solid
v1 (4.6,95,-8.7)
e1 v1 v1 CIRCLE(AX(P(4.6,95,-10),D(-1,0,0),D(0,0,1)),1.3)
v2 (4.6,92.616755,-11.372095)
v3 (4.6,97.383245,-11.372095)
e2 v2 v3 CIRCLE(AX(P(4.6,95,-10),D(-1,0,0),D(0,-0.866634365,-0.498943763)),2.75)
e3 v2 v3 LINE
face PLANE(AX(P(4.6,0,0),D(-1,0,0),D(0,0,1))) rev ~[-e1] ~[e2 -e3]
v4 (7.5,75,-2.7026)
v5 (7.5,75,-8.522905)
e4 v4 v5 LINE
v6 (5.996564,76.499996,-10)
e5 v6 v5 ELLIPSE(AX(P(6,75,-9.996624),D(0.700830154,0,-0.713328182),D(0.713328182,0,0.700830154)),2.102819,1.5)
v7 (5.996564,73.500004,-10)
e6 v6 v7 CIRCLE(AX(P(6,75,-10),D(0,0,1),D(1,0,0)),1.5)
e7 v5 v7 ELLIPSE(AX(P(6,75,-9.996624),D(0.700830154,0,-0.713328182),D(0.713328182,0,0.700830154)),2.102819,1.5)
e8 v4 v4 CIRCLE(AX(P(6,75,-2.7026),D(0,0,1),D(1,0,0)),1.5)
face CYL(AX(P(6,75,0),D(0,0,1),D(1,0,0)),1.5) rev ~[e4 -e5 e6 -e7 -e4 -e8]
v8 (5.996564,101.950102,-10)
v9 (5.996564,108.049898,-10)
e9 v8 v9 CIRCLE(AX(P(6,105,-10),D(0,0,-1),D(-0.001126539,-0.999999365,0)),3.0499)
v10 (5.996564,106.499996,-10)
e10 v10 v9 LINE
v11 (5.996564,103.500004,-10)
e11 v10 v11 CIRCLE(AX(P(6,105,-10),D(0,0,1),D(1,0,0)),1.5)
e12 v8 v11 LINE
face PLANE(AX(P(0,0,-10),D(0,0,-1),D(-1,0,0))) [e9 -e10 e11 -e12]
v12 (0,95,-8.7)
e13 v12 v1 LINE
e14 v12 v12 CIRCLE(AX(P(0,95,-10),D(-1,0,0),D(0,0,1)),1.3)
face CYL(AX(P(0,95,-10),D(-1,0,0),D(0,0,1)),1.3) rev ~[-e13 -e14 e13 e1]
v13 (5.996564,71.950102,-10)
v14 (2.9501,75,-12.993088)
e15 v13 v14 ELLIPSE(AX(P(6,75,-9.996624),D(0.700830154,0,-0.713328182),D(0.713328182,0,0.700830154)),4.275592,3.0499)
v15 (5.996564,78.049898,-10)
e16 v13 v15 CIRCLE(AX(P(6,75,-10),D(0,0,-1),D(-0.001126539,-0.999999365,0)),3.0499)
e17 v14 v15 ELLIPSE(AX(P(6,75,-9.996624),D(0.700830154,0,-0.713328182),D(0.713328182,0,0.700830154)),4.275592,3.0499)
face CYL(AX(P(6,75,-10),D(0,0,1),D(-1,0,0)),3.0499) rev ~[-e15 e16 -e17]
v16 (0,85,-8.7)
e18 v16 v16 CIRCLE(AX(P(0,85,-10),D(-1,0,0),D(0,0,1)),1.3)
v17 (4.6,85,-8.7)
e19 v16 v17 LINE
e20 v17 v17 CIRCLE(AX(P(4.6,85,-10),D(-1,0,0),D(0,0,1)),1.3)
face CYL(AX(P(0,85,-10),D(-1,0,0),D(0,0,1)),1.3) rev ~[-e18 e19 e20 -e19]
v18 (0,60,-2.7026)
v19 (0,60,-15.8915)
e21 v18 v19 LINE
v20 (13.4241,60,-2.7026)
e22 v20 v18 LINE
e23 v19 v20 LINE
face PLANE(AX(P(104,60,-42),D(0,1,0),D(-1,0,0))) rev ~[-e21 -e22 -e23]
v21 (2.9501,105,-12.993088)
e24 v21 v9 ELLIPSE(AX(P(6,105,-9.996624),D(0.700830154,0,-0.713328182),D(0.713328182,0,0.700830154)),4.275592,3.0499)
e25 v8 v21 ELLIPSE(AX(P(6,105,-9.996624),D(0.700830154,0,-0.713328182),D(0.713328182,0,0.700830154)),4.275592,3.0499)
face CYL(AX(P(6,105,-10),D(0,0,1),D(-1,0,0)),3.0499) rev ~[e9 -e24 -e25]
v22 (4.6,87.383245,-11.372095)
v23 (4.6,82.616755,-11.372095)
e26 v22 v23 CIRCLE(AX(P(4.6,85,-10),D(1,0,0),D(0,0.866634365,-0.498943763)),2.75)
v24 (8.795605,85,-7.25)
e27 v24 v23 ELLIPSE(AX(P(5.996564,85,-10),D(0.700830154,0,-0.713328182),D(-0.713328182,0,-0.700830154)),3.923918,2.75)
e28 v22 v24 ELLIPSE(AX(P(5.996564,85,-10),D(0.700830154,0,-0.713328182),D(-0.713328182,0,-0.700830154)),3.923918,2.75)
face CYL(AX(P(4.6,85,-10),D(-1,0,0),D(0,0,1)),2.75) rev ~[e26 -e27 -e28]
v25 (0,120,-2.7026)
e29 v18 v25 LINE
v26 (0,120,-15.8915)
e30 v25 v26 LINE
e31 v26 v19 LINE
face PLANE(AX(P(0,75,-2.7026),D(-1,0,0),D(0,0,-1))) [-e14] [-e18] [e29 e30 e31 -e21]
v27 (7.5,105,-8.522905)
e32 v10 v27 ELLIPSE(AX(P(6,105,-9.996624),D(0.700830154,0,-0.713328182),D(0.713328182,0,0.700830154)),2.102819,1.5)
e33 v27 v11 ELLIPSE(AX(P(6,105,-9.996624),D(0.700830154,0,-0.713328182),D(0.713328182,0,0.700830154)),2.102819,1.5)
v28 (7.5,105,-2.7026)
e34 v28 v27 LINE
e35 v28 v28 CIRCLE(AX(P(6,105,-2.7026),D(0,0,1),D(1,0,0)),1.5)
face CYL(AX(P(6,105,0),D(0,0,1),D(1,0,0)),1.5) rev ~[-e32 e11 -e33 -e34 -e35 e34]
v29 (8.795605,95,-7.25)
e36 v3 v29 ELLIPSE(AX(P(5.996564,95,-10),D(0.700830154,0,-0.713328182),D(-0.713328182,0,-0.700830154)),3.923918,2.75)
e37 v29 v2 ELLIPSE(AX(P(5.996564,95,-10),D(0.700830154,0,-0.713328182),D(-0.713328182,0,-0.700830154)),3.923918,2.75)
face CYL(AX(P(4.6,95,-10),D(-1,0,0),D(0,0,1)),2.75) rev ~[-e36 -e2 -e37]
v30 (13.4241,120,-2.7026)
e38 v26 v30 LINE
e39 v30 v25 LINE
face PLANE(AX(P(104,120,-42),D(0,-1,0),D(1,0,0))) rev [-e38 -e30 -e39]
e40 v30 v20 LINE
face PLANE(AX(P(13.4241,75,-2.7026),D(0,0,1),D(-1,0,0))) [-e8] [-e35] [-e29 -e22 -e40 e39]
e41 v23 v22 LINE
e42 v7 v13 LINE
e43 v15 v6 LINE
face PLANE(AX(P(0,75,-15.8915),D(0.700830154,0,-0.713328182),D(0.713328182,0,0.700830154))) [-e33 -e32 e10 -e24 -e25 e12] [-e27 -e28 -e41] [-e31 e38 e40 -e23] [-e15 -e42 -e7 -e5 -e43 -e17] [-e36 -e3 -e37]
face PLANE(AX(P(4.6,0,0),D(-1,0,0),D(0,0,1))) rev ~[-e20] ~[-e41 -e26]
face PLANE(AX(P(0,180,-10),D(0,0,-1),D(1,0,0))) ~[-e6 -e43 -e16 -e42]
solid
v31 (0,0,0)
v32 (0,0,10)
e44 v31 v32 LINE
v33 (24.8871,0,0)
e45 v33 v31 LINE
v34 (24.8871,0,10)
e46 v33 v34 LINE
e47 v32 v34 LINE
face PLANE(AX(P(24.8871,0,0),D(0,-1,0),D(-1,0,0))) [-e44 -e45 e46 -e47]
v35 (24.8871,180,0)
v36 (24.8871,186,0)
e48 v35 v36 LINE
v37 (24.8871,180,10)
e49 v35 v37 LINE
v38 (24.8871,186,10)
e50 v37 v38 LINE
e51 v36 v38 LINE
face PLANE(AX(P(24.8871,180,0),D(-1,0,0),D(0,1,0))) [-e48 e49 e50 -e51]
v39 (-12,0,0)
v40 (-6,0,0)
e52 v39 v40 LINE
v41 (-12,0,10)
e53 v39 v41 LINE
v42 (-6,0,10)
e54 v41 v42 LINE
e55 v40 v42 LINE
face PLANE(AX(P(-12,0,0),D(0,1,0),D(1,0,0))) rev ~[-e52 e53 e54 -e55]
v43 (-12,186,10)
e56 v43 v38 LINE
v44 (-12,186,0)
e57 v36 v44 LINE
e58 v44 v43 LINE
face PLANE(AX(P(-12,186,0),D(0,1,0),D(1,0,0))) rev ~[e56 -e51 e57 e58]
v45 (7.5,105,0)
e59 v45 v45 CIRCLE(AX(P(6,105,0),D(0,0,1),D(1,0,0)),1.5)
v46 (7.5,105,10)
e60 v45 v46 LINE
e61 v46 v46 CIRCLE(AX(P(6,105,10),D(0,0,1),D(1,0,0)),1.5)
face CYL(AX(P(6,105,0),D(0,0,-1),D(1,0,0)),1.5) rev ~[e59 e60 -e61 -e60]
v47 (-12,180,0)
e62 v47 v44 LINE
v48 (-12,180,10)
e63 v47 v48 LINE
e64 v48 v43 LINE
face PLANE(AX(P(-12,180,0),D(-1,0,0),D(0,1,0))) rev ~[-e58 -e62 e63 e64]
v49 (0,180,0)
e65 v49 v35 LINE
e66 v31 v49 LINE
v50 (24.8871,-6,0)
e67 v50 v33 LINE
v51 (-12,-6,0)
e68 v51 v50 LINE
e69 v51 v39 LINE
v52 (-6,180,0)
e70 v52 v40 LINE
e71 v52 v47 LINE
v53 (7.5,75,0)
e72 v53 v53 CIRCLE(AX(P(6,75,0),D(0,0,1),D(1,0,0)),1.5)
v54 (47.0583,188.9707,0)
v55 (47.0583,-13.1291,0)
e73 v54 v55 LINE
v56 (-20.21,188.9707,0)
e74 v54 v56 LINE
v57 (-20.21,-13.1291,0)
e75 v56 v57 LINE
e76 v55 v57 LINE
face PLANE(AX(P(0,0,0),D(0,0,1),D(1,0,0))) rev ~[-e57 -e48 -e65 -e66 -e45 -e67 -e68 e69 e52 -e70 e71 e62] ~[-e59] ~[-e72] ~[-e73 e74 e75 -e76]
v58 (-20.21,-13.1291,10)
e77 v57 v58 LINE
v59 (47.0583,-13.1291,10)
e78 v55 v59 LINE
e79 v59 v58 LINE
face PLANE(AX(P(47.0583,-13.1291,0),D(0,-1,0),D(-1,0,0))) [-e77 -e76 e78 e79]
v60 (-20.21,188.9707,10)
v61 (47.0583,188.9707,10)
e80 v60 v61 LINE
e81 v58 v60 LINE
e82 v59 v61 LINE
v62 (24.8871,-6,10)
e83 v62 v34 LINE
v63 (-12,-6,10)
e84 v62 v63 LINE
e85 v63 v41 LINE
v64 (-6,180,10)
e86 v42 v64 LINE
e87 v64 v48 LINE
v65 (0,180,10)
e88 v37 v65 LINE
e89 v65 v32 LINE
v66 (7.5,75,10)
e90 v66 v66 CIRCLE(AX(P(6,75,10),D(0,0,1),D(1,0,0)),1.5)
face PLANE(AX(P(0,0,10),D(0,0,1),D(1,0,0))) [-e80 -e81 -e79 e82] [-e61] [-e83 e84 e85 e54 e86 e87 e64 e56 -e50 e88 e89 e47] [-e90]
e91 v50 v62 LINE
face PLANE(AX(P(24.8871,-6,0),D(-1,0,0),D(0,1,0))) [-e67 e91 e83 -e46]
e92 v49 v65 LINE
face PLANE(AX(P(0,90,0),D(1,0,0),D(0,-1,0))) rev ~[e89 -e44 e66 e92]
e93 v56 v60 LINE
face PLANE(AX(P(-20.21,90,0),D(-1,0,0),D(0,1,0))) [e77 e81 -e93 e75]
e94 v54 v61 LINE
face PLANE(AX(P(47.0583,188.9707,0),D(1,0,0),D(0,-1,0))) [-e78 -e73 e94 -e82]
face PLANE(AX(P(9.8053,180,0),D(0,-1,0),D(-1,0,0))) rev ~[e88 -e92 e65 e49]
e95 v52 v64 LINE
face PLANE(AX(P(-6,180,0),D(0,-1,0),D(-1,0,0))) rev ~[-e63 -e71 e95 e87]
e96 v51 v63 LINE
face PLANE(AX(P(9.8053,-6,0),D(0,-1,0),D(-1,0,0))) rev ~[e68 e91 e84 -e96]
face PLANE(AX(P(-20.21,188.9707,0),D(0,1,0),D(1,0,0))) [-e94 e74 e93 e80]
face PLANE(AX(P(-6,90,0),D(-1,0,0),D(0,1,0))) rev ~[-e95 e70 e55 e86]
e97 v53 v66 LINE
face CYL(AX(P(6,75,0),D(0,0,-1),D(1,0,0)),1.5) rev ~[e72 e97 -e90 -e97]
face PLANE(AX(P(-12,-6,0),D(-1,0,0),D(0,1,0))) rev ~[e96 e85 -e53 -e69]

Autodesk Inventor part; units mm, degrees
ref_plane "YZ Plane" through (0, 0, 0) normal (1, 0, 0) x (0, 1, 0)
ref_plane "XZ Plane" through (0, 0, 0) normal (0, 1, 0) x (-1, 0, 0)
ref_plane "XY Plane" through (0, 0, 0) normal (0, 0, 1) x (1, 0, 0)
ref_plane "РабПлоскость1" through (0, 0, 0) normal (0, 0, 1) x (1, 0, 0)
sketch "Эскиз1" plane through (0, 0, 0) normal (0, 0, 1) x (1, 0, 0)
  line L0 (-20.21, 188.9707) -> (47.0583, 188.9707)
  line L1 (47.0583, 188.9707) -> (47.0583, -13.1291)
  line L2 (47.0583, -13.1291) -> (-20.21, -13.1291)
  line L3 (-20.21, -13.1291) -> (-20.21, 188.9707)
  line L4 (220, -6) -> (168.1947, -6)
  line L5 (168.1947, 0) -> (168.1947, -6)
  line L6 (168.1947, 0) -> (220, 0)
  line L7 (220, 0) -> (220, -6)
  line L8 (9.8053, -6) -> (-12, -6)
  line L9 (-12, -6) -> (-12, 0)
  line L10 (-12, 0) -> (9.8053, 0)
  line L11 (9.8053, 0) -> (9.8053, -6)
  line L12 (220, 180) -> (168.1947, 180)
  line L13 (168.1947, 186) -> (168.1947, 180)
  line L14 (168.1947, 186) -> (220, 186)
  line L15 (220, 186) -> (220, 180)
  line L16 (9.8053, 180) -> (-12, 180)
  line L17 (-12, 180) -> (-12, 186)
  line L18 (-12, 186) -> (9.8053, 186)
  line L19 (9.8053, 186) -> (9.8053, 180)
  line L20 (0, 180) -> (0, 0)
  line L21 (0, 0) -> (-6, 0)
  line L22 (-6, 0) -> (-6, 180)
  line L23 (-6, 180) -> (0, 180)
  circle A0 centre (-3, 175) radius 1.5
  circle A1 centre (-3, 5) radius 1.5
  line L24 (9.8053, -6) -> (24.8871, -6)
  line L25 (24.8871, -6) -> (24.8871, 0)
  line L26 (24.8871, 0) -> (9.8053, 0)
  line L27 (9.8053, 0) -> (9.8053, -6)
  line L28 (9.8053, 180) -> (24.8871, 180)
  line L29 (24.8871, 180) -> (24.8871, 188.9707)
  line L30 (24.8871, 188.9707) -> (9.8053, 188.9707)
  line L31 (9.8053, 188.9707) -> (9.8053, 180)
  circle A2 centre (6, 75) radius 1.5
  circle A3 centre (6, 105) radius 1.5
  line L32 (-1364.1034, 90) -> (1460.214, 90)
  line L33 (9.8053, 186) -> (24.8871, 186)
  dimension "d0" = 3
  dimension "d1" = 3
  dimension "d2" = 6
  dimension "d3" = 6
  dimension "d4" = 15
  dimension "d5" = 15
ref_plane "РабПлоскость2" through (104, 75, -42) normal (0, 1, 0) x (-1, 0, 0)
sketch "Эскиз2" plane through (104, 75, -42) normal (0, 1, 0) x (-1, 0, 0)
  line L0 (104, 42) -> (104, 26.1085)
  line L1 (104, 26.1085) -> (90.5759, 39.2974)
  line L2 (90.5759, 39.2974) -> (104, 39.2974)
extrude "Выдавливание2" add sketch "Эскиз2" along normal mid plane 30
ref_plane "РабПлоскость3" through (104, 90, -42) normal (0, 1, 0) x (-1, 0, 0)
mirror "Зеркальное отражение1" about plane through (104, 90, -42) normal (0, 1, 0) of "Выдавливание2"
ref_plane "РабПлоскость7" through (0, 0, 0) normal (0, 0, 1) x (1, 0, 0)
sketch "Эскиз3" plane through (0, 0, 0) normal (0, 0, 1) x (1, 0, 0)
  line L0 (47.0583, 188.9707) -> (-20.21, 188.9707) projected
  line L1 (-20.21, 188.9707) -> (-20.21, -13.1291) projected
  line L2 (-20.21, -13.1291) -> (47.0583, -13.1291) projected
  line L3 (47.0583, -13.1291) -> (47.0583, 188.9707) projected
  circle A0 centre (6, 105) radius 1.5 projected
  circle A1 centre (6, 75) radius 1.5 projected
  line L4 (-12, 186) -> (24.8871, 186) projected
  line L5 (24.8871, 186) -> (24.8871, 180) projected
  line L6 (24.8871, 180) -> (0, 180) projected
  line L7 (0, 180) -> (0, 0) projected
  line L8 (0, 0) -> (24.8871, 0) projected
  line L9 (24.8871, 0) -> (24.8871, -6) projected
  line L10 (24.8871, -6) -> (-12, -6) projected
  line L11 (-12, -6) -> (-12, 0) projected
  line L12 (-12, 0) -> (-6, 0) projected
  line L13 (-6, 0) -> (-6, 180) projected
  line L14 (-6, 180) -> (-12, 180) projected
  line L15 (-12, 180) -> (-12, 186) projected
extrude "Выдавливание3" cut sketch "Эскиз3" against normal blind 13.891 contours A0 | A1
ref_plane "РабПлоскость4" through (0, 0, -10) normal (0, 0, -1) x (-1, 0, 0)
sketch "Эскиз4" plane through (0, 0, -10) normal (0, 0, -1) x (-1, 0, 0)
  line L0 (0, 60) -> (-13.4241, 60) projected
  line L1 (0, 120) -> (0, 60) projected
  line L2 (0, 120) -> (-13.4241, 120) projected
  circle A0 centre (-6, 105) radius 3.0499
  line L3 (-13.4241, 60) -> (-13.4241, 120) projected
  point P0 (0, 0)
extrude "Выдавливание4" cut sketch "Эскиз4" along normal blind 30 contours A0
mirror "Зеркальное отражение2" about plane through (104, 90, -42) normal (0, 1, 0) of "Выдавливание4"
ref_plane "РабПлоскость6" through (0, 0, 0) normal (-1, 0, 0) x (0, 0, 1)
sketch "Эскиз5" plane through (0, 0, 0) normal (-1, 0, 0) x (0, 0, 1)
  circle A0 centre (-10, 95) radius 1.3
  circle A1 centre (-10, 85) radius 1.3
  line L0 (-19.0698, 90) -> (3.1783, 90) projected
  line L1 (-3, -13.1291) -> (-3, 188.9707) projected
  point P0 (0, 0)
  dimension "d16" = 2.6
  dimension "d17" = 5
  dimension "d18" = 5
  dimension "d19" = 2.6
  dimension "d20" = 7
  dimension "d21" = 7
extrude "Выдавливание5" cut sketch "Эскиз5" against normal up to surface surface through (13.4241, 75, -2.7026) normal (0.7008276, 0, -0.7133306)
ref_plane "РабПлоскость5" through (4.6, 0, 0) normal (-1, 0, 0) x (0, 0, 1)
sketch "Эскиз6" plane through (4.6, 0, 0) normal (-1, 0, 0) x (0, 0, 1)
  circle A0 centre (-10, 85) radius 1.3 projected
  circle A1 centre (-10, 95) radius 1.3 projected
  line L0 (-3, 120) -> (-15.8915, 120) projected
  line L1 (-15.8915, 120) -> (-15.8915, 60) projected
  line L2 (-3, 60) -> (-15.8915, 60) projected
  line L3 (-3, 0) -> (-3, 60) projected
  line L4 (0, 0) -> (-3, 0) projected
  line L5 (0, 180) -> (0, 0) projected
  line L6 (0, 180) -> (-3, 180) projected
  line L7 (-3, 120) -> (-3, 180) projected
  circle A2 centre (-10, 85) radius 2.75
  circle A3 centre (-10, 95) radius 2.75
  point P0 (0, 0)
  dimension "d25" = 5.5
  dimension "d26" = 5.5
extrude "Выдавливание6" cut sketch "Эскиз6" against normal blind 10 contours A0 | A2 | A3
extrude "Выдавливание7" add sketch "Эскиз1" along normal blind 10 contours L0 L31 L18 L17 L16 L22 L32 L3 | L0 L29 L33 L31 | L32 L22 L10 L9 L8 L24 L25 L26 L20 L1 L2 L3 | L0 L1 L32 L20 L16 L28 L29
properties part number "4s"
